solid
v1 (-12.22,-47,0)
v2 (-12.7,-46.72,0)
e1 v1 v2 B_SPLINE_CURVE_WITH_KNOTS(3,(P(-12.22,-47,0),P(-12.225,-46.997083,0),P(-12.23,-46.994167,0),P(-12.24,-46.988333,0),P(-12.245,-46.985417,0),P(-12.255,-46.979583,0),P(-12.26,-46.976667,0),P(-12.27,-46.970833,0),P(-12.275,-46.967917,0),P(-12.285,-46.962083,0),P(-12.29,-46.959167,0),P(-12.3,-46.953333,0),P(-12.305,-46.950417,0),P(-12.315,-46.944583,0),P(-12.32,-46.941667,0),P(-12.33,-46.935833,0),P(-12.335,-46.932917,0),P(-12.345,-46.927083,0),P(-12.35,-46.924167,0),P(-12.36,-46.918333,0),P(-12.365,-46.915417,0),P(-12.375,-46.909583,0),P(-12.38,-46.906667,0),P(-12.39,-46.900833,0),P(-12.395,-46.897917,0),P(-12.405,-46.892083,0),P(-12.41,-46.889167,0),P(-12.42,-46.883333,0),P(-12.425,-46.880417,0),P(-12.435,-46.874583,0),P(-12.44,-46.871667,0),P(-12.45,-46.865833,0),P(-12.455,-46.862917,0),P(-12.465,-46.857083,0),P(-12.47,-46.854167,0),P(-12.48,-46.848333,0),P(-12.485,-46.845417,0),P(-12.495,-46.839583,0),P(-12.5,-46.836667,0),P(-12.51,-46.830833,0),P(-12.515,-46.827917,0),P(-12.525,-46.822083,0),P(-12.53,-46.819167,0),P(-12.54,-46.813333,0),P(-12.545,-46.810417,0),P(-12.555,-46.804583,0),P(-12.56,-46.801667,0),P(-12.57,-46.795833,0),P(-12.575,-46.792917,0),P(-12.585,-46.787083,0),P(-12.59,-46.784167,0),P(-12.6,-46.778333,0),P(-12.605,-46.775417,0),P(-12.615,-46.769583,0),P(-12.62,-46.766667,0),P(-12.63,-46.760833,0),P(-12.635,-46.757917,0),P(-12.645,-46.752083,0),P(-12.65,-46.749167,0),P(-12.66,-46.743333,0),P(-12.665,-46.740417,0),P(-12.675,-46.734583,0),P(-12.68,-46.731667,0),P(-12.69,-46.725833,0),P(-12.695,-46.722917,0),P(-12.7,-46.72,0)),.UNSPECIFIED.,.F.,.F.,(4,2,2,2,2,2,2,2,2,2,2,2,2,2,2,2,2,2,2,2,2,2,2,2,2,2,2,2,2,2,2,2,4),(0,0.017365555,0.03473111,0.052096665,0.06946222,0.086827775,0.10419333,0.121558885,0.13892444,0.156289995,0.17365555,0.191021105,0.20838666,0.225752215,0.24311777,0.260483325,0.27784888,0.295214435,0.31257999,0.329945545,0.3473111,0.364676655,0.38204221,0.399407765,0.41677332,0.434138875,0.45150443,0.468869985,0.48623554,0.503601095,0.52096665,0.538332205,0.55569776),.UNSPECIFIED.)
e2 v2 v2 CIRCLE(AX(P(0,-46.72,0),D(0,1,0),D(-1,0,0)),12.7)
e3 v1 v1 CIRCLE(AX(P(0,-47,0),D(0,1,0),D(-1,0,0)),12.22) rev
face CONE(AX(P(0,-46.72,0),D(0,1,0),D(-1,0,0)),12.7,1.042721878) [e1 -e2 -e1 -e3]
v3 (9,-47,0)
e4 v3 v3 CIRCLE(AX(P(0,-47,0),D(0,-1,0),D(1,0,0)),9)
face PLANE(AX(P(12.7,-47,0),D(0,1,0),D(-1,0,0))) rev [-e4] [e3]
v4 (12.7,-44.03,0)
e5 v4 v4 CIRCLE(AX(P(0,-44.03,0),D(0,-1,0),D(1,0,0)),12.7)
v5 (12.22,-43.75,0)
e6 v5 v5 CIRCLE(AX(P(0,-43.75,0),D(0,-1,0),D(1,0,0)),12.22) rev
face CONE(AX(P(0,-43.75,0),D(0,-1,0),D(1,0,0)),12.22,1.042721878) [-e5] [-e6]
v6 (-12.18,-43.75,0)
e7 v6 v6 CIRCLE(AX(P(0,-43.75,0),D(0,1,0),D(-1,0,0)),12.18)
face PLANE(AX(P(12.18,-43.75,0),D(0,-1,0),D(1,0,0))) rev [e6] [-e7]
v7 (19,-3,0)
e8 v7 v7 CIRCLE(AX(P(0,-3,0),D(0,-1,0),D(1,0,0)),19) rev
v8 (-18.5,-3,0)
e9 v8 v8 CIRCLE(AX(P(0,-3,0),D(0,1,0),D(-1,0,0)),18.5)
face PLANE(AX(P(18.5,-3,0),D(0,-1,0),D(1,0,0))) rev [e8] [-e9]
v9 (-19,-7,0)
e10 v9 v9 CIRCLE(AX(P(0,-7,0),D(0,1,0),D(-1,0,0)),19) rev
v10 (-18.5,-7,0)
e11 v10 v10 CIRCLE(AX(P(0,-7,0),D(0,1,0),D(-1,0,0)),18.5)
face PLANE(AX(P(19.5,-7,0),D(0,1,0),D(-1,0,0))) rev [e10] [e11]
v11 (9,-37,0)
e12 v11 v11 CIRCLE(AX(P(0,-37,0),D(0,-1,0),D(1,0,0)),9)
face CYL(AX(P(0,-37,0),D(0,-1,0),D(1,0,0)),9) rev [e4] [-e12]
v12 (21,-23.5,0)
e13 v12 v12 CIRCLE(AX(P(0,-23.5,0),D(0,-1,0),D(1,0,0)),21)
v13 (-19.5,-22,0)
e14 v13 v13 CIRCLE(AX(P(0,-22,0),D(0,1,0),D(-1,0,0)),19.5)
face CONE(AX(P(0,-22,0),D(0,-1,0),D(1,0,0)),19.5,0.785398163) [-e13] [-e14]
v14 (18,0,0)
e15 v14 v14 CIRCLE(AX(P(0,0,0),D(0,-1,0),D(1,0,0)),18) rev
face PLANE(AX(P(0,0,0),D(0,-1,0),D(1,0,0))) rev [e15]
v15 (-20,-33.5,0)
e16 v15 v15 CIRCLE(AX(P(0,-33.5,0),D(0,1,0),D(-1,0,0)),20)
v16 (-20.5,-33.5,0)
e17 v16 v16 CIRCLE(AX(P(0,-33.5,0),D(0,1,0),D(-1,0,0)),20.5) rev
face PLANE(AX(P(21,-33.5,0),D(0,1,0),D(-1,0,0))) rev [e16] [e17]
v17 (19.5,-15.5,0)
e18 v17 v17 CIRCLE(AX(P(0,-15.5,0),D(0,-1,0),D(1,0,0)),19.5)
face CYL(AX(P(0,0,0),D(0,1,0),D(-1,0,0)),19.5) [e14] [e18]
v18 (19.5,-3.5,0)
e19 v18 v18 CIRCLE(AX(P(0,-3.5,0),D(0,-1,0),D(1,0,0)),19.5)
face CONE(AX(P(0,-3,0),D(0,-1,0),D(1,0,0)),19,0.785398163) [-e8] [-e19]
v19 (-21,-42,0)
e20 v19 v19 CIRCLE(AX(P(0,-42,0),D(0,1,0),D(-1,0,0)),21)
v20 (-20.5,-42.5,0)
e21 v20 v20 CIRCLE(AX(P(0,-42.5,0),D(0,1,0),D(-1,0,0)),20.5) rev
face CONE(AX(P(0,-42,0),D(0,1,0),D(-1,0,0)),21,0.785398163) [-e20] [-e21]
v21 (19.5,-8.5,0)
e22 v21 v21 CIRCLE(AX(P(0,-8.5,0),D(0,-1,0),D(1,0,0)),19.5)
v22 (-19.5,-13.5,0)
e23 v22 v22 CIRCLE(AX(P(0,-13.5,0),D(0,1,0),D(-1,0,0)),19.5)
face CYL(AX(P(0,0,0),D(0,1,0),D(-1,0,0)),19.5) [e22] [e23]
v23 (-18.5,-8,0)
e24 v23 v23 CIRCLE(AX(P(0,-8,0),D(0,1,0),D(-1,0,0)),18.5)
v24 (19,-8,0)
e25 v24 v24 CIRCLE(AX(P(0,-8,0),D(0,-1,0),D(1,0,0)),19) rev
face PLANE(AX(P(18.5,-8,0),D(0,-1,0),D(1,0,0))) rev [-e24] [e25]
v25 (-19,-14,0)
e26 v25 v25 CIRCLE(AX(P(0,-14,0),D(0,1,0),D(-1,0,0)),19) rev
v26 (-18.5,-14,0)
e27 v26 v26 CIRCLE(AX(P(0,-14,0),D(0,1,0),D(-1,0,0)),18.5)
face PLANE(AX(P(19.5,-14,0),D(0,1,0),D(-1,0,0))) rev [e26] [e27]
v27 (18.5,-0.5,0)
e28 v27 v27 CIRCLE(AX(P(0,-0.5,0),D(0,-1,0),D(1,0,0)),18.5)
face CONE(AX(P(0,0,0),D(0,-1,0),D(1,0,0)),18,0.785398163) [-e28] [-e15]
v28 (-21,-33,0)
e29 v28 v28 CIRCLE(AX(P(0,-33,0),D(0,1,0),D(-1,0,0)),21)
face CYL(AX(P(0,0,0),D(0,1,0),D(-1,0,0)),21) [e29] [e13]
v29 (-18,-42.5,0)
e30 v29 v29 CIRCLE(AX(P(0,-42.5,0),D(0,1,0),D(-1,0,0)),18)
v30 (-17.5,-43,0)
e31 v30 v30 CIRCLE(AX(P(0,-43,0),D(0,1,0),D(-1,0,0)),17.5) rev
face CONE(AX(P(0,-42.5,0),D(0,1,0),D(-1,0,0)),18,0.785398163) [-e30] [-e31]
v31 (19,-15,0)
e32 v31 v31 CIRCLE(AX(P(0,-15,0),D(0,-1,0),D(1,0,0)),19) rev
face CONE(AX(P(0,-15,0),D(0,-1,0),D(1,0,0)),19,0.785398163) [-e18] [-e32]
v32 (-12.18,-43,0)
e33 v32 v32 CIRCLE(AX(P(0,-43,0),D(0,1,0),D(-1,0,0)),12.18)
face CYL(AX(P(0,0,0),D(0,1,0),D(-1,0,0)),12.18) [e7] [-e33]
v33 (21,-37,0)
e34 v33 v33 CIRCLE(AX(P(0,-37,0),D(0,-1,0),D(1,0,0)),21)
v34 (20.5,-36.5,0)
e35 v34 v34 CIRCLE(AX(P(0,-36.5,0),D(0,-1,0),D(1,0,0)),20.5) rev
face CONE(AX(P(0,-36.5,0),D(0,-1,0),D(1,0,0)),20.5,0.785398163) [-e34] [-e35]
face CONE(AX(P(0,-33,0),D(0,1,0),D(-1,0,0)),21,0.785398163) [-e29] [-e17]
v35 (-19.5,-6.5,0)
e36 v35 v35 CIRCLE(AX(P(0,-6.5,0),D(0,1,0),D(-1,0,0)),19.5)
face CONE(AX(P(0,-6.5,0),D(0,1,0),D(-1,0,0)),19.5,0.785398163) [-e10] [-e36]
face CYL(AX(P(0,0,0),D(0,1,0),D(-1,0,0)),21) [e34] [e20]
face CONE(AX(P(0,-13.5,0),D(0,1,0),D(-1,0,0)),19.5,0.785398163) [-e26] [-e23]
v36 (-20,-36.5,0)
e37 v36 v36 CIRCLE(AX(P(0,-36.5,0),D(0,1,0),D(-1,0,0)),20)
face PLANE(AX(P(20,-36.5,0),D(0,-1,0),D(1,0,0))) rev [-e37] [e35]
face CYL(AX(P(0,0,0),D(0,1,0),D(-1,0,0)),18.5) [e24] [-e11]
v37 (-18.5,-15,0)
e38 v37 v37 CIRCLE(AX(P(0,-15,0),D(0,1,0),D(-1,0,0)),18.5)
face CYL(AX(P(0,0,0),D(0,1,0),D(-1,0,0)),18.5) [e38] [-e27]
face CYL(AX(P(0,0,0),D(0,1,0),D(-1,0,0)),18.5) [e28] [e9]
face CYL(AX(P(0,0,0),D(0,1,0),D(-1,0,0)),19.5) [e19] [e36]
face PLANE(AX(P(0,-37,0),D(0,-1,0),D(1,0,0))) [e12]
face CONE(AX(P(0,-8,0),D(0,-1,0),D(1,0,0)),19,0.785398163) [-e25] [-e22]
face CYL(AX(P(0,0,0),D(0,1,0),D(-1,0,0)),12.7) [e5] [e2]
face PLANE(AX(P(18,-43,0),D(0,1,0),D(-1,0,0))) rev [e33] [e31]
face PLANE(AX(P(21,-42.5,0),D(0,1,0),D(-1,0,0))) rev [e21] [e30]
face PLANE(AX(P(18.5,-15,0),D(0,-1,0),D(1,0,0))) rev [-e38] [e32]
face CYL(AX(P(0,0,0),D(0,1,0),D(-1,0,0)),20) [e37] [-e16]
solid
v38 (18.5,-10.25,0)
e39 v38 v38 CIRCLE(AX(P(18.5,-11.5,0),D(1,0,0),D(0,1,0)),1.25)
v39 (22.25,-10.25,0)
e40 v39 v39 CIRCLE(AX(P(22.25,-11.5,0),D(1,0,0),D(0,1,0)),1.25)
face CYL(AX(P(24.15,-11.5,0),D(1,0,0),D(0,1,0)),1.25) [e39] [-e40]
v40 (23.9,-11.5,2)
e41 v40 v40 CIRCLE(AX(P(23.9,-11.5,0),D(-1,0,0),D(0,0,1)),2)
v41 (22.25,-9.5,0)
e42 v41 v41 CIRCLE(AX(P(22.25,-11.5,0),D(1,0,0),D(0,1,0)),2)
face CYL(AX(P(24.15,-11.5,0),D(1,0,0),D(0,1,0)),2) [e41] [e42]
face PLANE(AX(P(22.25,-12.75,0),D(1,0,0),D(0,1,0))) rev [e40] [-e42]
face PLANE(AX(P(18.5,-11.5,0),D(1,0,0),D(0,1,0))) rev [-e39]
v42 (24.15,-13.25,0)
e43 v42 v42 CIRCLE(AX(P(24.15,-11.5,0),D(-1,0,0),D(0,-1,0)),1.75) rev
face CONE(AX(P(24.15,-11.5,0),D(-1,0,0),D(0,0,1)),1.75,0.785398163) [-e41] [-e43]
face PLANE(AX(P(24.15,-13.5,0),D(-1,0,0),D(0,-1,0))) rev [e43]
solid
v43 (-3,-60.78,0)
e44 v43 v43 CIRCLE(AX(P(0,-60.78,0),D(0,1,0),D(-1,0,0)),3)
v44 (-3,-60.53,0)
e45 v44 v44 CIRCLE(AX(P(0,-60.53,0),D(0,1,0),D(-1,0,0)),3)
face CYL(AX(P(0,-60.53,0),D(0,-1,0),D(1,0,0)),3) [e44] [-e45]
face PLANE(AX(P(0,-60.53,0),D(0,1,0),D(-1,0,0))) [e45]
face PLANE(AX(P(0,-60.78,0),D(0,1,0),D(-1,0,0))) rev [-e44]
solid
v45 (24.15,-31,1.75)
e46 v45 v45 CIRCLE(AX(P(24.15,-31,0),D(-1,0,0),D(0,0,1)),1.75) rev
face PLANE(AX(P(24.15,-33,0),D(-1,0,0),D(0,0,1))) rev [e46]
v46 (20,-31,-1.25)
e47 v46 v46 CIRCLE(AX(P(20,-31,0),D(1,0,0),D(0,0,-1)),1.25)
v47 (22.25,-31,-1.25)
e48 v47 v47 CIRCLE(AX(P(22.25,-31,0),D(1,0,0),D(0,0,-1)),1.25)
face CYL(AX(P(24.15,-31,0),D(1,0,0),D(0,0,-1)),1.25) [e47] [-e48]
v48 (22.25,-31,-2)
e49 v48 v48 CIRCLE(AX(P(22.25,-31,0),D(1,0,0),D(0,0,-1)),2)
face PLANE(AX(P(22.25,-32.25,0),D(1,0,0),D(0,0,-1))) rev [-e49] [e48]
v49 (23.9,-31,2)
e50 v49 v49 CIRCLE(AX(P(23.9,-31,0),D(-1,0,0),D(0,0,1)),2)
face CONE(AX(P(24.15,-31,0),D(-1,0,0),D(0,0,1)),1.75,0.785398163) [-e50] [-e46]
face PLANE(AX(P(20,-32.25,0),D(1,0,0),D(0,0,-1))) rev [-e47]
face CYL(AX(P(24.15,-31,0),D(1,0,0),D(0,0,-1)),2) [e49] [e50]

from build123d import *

# Parameters (mm, degrees)
F_5MM_BODY_CHAMFERS_SIZE           = 0.5
F_1_5MM_BODY_CHAMFERS_SIZE         = 1.5
F_48MM_X_28MM_BODY_CHAMFER_1_SIZE  = 0.28
F_48MM_X_28MM_BODY_CHAMFER_1_SIZE2 = 0.48
F_48MM_X_28MM_BODY_CHAMFER_2_SIZE  = 0.48
F_48MM_X_28MM_BODY_CHAMFER_2_SIZE2 = 0.28
SKETCH2_R                          = 9
SENSOR_HOLE_DEPTH                  = 10
F_25MM_UPPER_KNOB_CHAMFER_SIZE     = 0.25
F_25MM_LOWER_KNOB_CHAMFER_SIZE     = 0.25
SKETCH9_R                          = 3
FOCAL_POINT_DEPTH                  = 0.25


with BuildPart() as part:
    # Sketch1 → Lens Body (revolve)
    with BuildSketch(Plane.XY, mode=Mode.PRIVATE) as lens_body_sk:
        Polygon((0, 0), (18.5, 0), (18.5, -3), (19.5, -3), (19.5, -7), (18.5, -7), (18.5, -8), (19.5, -8), (19.5, -14), (18.5, -14), (18.5, -15), (19.5, -15), (19.5, -22), (21, -22), (21, -33.5), (20, -33.5), (20, -36.5), (21, -36.5), (21, -42.5), (18, -42.5), (18, -43), (12.18, -43), (12.18, -43.75), (12.7, -43.75), (12.7, -47), (0, -47), align=None)
    revolve(lens_body_sk.sketch.rotate(Axis((0, 0, 0), (0, -1, 0)), 180), axis=Axis((0, 0, 0), (0, -1, 0)))

    # .5mm Body Chamfers
    f_5mm_body_chamfers_edges = [part.edges().sort_by_distance(p)[0] for p in [
        (18, -43, 0),
        (21, -42.5, 0),
        (21, -36.5, 0),
        (21, -33.5, 0),
        (19.5, -15, 0),
        (19.5, -14, 0),
        (19.5, -8, 0),
        (19.5, -7, 0),
        (19.5, -3, 0),
        (18.5, 0, 0),
    ]]
    chamfer(f_5mm_body_chamfers_edges, length=F_5MM_BODY_CHAMFERS_SIZE - 0.0001)  # a hair under: the kernel refuses the full size

    # 1.5mm Body Chamfers
    f_1_5mm_body_chamfers_edges = [part.edges().sort_by_distance(p)[0] for p in [
        (21, -22, 0),
    ]]
    chamfer(f_1_5mm_body_chamfers_edges, length=F_1_5MM_BODY_CHAMFERS_SIZE - 0.0001)  # a hair under: the kernel refuses the full size

    # .48mm x .28mm Body Chamfer 1
    f_48mm_x_28mm_body_chamfer_1_edges = [part.edges().sort_by_distance(p)[0] for p in [
        (12.7, -43.75, 0),
    ]]
    f_48mm_x_28mm_body_chamfer_1_side = [part.faces().sort_by_distance(p)[0] for p in [
        (12.7, -45.375, 0),
    ]]
    chamfer(f_48mm_x_28mm_body_chamfer_1_edges, length=F_48MM_X_28MM_BODY_CHAMFER_1_SIZE, length2=F_48MM_X_28MM_BODY_CHAMFER_1_SIZE2, reference=f_48mm_x_28mm_body_chamfer_1_side[0])

    # .48mm x .28mm Body Chamfer 2
    f_48mm_x_28mm_body_chamfer_2_edges = [part.edges().sort_by_distance(p)[0] for p in [
        (12.7, -47, 0),
    ]]
    f_48mm_x_28mm_body_chamfer_2_side = [part.faces().sort_by_distance(p)[0] for p in [
        (0, -47, 0),
    ]]
    chamfer(f_48mm_x_28mm_body_chamfer_2_edges, length=F_48MM_X_28MM_BODY_CHAMFER_2_SIZE, length2=F_48MM_X_28MM_BODY_CHAMFER_2_SIZE2, reference=f_48mm_x_28mm_body_chamfer_2_side[0])

    # Sketch2 → Sensor Hole (cut)
    with BuildSketch(Plane.XZ.offset(47)):
        Circle(SKETCH2_R)
    extrude(amount=-SENSOR_HOLE_DEPTH, mode=Mode.SUBTRACT)


with BuildPart() as body_2:
    # Sketch7 → Lower Knob (revolve)
    with BuildSketch(Plane.XY, mode=Mode.PRIVATE) as lower_knob_sk:
        Polygon((20, -32.25), (22.25, -32.25), (22.25, -33), (24.15, -33), (24.15, -31), (20, -31), align=None)
    revolve(lower_knob_sk.sketch.rotate(Axis((24.15, -31, 0), (-1, 0, 0)), 270), axis=Axis((24.15, -31, 0), (-1, 0, 0)))

    # .25mm Lower Knob Chamfer
    f_25mm_lower_knob_chamfer_edges = [body_2.edges().sort_by_distance(p)[0] for p in [
        (24.15, -31, 2),
    ]]
    chamfer(f_25mm_lower_knob_chamfer_edges, length=F_25MM_LOWER_KNOB_CHAMFER_SIZE)


with BuildPart() as body_3:
    # Sketch8 → Upper Knob (revolve)
    with BuildSketch(Plane.XY, mode=Mode.PRIVATE) as upper_knob_sk:
        Polygon((18.5, -12.75), (22.25, -12.75), (22.25, -13.5), (24.15, -13.5), (24.15, -11.5), (18.5, -11.5), align=None)
    revolve(upper_knob_sk.sketch.rotate(Axis((24.15, -11.5, 0), (-1, 0, 0)), 180), axis=Axis((24.15, -11.5, 0), (-1, 0, 0)))

    # .25mm Upper Knob Chamfer
    f_25mm_upper_knob_chamfer_edges = [body_3.edges().sort_by_distance(p)[0] for p in [
        (24.15, -13.5, 0),
    ]]
    chamfer(f_25mm_upper_knob_chamfer_edges, length=F_25MM_UPPER_KNOB_CHAMFER_SIZE)


with BuildPart() as body_4:
    # Sketch9 → Focal Point (new body)
    with BuildSketch(Plane(origin=(0, -60.78, 0), x_dir=(1, 0, 0), z_dir=(0, 1, 0))):
        with Locations(Location((0, 0, 0), (0, 0, 180))):
            Circle(SKETCH9_R)
    extrude(amount=FOCAL_POINT_DEPTH)


solid = Compound([part.part, body_2.part, body_3.part, body_4.part])
